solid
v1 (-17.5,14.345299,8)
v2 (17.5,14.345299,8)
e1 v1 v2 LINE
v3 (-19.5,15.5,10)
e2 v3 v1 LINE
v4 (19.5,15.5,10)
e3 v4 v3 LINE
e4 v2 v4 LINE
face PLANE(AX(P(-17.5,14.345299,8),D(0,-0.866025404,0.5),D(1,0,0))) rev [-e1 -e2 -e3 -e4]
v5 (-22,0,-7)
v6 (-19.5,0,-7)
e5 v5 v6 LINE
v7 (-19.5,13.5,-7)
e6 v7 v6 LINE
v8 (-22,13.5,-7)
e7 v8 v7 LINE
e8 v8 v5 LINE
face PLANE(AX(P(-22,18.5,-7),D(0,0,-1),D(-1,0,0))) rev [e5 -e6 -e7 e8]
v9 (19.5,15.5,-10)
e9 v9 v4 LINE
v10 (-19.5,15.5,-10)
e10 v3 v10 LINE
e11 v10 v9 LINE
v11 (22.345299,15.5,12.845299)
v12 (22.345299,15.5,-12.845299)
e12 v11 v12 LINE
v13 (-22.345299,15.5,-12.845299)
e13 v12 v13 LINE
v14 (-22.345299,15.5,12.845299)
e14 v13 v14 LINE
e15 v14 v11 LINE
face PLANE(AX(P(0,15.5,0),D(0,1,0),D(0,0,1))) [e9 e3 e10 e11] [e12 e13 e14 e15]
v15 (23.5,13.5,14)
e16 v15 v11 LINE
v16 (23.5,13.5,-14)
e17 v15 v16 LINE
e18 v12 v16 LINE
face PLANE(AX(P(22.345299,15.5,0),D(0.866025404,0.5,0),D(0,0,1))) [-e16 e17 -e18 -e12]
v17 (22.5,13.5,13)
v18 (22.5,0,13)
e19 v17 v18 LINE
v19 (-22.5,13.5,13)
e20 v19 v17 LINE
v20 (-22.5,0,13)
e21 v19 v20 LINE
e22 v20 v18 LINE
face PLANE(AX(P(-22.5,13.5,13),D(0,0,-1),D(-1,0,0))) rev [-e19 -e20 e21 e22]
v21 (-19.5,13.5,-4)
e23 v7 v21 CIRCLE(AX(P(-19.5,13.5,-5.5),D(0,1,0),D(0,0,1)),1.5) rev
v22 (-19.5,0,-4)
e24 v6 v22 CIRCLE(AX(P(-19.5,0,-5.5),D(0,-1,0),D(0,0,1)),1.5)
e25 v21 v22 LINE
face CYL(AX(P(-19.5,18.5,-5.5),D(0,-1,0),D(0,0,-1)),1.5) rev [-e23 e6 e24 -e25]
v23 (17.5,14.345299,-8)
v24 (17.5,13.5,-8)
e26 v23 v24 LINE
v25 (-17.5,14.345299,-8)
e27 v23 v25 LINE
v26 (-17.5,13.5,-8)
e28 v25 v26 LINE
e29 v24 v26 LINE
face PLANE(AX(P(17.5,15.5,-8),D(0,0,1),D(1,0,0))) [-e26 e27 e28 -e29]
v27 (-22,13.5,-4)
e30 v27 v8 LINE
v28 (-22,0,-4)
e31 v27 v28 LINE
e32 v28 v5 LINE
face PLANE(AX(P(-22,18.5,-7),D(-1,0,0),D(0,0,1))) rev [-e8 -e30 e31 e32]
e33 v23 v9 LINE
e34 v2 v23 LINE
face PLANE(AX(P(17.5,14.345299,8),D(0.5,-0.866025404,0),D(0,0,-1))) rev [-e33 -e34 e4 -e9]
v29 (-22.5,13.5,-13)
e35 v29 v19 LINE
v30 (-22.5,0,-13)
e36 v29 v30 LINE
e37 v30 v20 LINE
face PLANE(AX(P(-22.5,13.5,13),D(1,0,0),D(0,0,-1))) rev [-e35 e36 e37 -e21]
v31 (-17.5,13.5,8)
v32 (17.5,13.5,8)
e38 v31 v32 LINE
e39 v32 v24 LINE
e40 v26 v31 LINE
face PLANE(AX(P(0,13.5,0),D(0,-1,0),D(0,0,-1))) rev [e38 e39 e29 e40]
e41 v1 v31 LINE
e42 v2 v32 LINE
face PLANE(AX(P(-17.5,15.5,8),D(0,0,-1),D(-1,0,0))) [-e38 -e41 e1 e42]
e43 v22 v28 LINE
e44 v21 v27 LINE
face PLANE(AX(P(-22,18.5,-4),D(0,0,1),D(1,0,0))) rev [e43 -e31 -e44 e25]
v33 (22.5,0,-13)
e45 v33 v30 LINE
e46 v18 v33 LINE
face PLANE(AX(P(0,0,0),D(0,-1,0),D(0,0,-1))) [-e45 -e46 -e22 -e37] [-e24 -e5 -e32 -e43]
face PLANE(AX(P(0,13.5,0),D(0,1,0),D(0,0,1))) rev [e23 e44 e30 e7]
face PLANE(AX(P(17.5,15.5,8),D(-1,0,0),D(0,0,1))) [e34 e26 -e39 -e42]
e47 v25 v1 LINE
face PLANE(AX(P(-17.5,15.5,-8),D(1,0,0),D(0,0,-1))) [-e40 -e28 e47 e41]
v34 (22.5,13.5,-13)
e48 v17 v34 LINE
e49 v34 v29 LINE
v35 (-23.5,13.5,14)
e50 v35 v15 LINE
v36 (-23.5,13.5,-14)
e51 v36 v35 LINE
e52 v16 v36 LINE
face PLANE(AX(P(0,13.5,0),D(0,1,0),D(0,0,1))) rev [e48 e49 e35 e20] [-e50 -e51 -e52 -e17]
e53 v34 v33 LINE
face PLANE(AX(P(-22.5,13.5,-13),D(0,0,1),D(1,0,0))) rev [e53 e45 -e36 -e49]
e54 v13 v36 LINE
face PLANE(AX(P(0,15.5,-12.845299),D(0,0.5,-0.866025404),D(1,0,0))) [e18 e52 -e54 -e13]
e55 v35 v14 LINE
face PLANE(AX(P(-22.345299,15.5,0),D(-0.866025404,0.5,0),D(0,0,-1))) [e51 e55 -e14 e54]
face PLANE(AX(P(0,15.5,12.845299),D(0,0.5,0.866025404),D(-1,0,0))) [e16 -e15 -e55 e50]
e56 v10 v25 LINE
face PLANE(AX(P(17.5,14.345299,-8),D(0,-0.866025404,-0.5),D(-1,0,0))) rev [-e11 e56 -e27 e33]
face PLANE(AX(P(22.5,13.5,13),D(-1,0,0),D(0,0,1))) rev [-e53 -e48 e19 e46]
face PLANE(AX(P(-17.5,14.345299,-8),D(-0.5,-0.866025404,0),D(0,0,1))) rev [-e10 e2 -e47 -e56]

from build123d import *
from OCP.BRepFilletAPI import BRepFilletAPI_MakeChamfer

# Parameters (mm, degrees)
SKETCH1_W           = 45
SKETCH1_H           = 26
BOSS_EXTRUDE1_DEPTH = 13.5
SKETCH2_W           = 47
SKETCH2_H           = 28
SKETCH2_W_2         = 35
SKETCH2_H_2         = 16
BOSS_EXTRUDE2_DEPTH = 2
CHAMFER1_SIZE       = 2
CHAMFER1_SIZE_2     = 1.154700538
CUT_EXTRUDE1_DEPTH  = 13.5


with BuildPart() as part:
    # Sketch1 → Boss-Extrude1 (new body)
    with BuildSketch(Plane(origin=(0, 0, 0), x_dir=(1, 0, 0), z_dir=(0, 1, 0))):
        Rectangle(SKETCH1_W, SKETCH1_H)
    extrude(amount=BOSS_EXTRUDE1_DEPTH)

    # Sketch2 → Boss-Extrude2 (add)
    with BuildSketch(Plane(origin=(0, 13.5, 0), x_dir=(1, 0, 0), z_dir=(0, 1, 0))):
        Rectangle(SKETCH2_W, SKETCH2_H)
        Rectangle(SKETCH2_W_2, SKETCH2_H_2, mode=Mode.SUBTRACT)
    extrude(amount=BOSS_EXTRUDE2_DEPTH)

    # Chamfer1
    chamfer1_edges_1 = [part.edges().sort_by_distance(p)[0] for p in [
        (0, 15.5, -8),
    ]]
    chamfer1_side_1 = [part.faces().sort_by_distance(p)[0] for p in [
        (0, 15.5, -8.023094011),
    ]]
    chamfer1_edges_2 = [part.edges().sort_by_distance(p)[0] for p in [
        (-17.5, 15.5, 0),
    ]]
    chamfer1_side_2 = [part.faces().sort_by_distance(p)[0] for p in [
        (-17.523094011, 15.5, 0),
    ]]
    chamfer1_edges_3 = [part.edges().sort_by_distance(p)[0] for p in [
        (0, 15.5, 8),
    ]]
    chamfer1_side_3 = [part.faces().sort_by_distance(p)[0] for p in [
        (0, 15.5, 8.023094011),
    ]]
    chamfer1_edges_4 = [part.edges().sort_by_distance(p)[0] for p in [
        (17.5, 15.5, 0),
    ]]
    chamfer1_side_4 = [part.faces().sort_by_distance(p)[0] for p in [
        (17.523094011, 15.5, 0),
    ]]
    chamfer1_edges_5 = [part.edges().sort_by_distance(p)[0] for p in [
        (-23.5, 15.5, 0),
    ]]
    chamfer1_side_5 = [part.faces().sort_by_distance(p)[0] for p in [
        (-23.5, 15.476905989, 0),
    ]]
    chamfer1_edges_6 = [part.edges().sort_by_distance(p)[0] for p in [
        (0, 15.5, -14),
    ]]
    chamfer1_side_6 = [part.faces().sort_by_distance(p)[0] for p in [
        (0, 15.476905989, -14),
    ]]
    chamfer1_edges_7 = [part.edges().sort_by_distance(p)[0] for p in [
        (23.5, 15.5, 0),
    ]]
    chamfer1_side_7 = [part.faces().sort_by_distance(p)[0] for p in [
        (23.5, 15.476905989, 0),
    ]]
    chamfer1_edges_8 = [part.edges().sort_by_distance(p)[0] for p in [
        (0, 15.5, 14),
    ]]
    chamfer1_side_8 = [part.faces().sort_by_distance(p)[0] for p in [
        (0, 15.476905989, 14),
    ]]
    chamfer1 = BRepFilletAPI_MakeChamfer(part.part.solid().wrapped)
    for e in chamfer1_edges_1:
        chamfer1.Add(CHAMFER1_SIZE - 0.0001, CHAMFER1_SIZE_2 - 0.0001, e.wrapped, chamfer1_side_1[0].wrapped)
    for e in chamfer1_edges_2:
        chamfer1.Add(CHAMFER1_SIZE - 0.0001, CHAMFER1_SIZE_2 - 0.0001, e.wrapped, chamfer1_side_2[0].wrapped)
    for e in chamfer1_edges_3:
        chamfer1.Add(CHAMFER1_SIZE - 0.0001, CHAMFER1_SIZE_2 - 0.0001, e.wrapped, chamfer1_side_3[0].wrapped)
    for e in chamfer1_edges_4:
        chamfer1.Add(CHAMFER1_SIZE - 0.0001, CHAMFER1_SIZE_2 - 0.0001, e.wrapped, chamfer1_side_4[0].wrapped)
    for e in chamfer1_edges_5:
        chamfer1.Add(CHAMFER1_SIZE - 0.0001, CHAMFER1_SIZE_2 - 0.0001, e.wrapped, chamfer1_side_5[0].wrapped)
    for e in chamfer1_edges_6:
        chamfer1.Add(CHAMFER1_SIZE - 0.0001, CHAMFER1_SIZE_2 - 0.0001, e.wrapped, chamfer1_side_6[0].wrapped)
    for e in chamfer1_edges_7:
        chamfer1.Add(CHAMFER1_SIZE - 0.0001, CHAMFER1_SIZE_2 - 0.0001, e.wrapped, chamfer1_side_7[0].wrapped)
    for e in chamfer1_edges_8:
        chamfer1.Add(CHAMFER1_SIZE - 0.0001, CHAMFER1_SIZE_2 - 0.0001, e.wrapped, chamfer1_side_8[0].wrapped)
    add(Compound.cast(chamfer1.Shape()), mode=Mode.REPLACE)  # a hair under: the kernel refuses the full size

    # Sketch3 → Cut-Extrude1 (cut)
    with BuildSketch(Plane.XZ):
        with BuildLine():
            Line((-22, -4), (-19.5, -4))
            ThreePointArc((-19.5, -4), (-18, -5.5), (-19.5, -7))
            Line((-19.5, -7), (-22, -7))
            Line((-22, -7), (-22, -4))
        make_face()
    extrude(amount=-CUT_EXTRUDE1_DEPTH, mode=Mode.SUBTRACT)


solid = part.part
